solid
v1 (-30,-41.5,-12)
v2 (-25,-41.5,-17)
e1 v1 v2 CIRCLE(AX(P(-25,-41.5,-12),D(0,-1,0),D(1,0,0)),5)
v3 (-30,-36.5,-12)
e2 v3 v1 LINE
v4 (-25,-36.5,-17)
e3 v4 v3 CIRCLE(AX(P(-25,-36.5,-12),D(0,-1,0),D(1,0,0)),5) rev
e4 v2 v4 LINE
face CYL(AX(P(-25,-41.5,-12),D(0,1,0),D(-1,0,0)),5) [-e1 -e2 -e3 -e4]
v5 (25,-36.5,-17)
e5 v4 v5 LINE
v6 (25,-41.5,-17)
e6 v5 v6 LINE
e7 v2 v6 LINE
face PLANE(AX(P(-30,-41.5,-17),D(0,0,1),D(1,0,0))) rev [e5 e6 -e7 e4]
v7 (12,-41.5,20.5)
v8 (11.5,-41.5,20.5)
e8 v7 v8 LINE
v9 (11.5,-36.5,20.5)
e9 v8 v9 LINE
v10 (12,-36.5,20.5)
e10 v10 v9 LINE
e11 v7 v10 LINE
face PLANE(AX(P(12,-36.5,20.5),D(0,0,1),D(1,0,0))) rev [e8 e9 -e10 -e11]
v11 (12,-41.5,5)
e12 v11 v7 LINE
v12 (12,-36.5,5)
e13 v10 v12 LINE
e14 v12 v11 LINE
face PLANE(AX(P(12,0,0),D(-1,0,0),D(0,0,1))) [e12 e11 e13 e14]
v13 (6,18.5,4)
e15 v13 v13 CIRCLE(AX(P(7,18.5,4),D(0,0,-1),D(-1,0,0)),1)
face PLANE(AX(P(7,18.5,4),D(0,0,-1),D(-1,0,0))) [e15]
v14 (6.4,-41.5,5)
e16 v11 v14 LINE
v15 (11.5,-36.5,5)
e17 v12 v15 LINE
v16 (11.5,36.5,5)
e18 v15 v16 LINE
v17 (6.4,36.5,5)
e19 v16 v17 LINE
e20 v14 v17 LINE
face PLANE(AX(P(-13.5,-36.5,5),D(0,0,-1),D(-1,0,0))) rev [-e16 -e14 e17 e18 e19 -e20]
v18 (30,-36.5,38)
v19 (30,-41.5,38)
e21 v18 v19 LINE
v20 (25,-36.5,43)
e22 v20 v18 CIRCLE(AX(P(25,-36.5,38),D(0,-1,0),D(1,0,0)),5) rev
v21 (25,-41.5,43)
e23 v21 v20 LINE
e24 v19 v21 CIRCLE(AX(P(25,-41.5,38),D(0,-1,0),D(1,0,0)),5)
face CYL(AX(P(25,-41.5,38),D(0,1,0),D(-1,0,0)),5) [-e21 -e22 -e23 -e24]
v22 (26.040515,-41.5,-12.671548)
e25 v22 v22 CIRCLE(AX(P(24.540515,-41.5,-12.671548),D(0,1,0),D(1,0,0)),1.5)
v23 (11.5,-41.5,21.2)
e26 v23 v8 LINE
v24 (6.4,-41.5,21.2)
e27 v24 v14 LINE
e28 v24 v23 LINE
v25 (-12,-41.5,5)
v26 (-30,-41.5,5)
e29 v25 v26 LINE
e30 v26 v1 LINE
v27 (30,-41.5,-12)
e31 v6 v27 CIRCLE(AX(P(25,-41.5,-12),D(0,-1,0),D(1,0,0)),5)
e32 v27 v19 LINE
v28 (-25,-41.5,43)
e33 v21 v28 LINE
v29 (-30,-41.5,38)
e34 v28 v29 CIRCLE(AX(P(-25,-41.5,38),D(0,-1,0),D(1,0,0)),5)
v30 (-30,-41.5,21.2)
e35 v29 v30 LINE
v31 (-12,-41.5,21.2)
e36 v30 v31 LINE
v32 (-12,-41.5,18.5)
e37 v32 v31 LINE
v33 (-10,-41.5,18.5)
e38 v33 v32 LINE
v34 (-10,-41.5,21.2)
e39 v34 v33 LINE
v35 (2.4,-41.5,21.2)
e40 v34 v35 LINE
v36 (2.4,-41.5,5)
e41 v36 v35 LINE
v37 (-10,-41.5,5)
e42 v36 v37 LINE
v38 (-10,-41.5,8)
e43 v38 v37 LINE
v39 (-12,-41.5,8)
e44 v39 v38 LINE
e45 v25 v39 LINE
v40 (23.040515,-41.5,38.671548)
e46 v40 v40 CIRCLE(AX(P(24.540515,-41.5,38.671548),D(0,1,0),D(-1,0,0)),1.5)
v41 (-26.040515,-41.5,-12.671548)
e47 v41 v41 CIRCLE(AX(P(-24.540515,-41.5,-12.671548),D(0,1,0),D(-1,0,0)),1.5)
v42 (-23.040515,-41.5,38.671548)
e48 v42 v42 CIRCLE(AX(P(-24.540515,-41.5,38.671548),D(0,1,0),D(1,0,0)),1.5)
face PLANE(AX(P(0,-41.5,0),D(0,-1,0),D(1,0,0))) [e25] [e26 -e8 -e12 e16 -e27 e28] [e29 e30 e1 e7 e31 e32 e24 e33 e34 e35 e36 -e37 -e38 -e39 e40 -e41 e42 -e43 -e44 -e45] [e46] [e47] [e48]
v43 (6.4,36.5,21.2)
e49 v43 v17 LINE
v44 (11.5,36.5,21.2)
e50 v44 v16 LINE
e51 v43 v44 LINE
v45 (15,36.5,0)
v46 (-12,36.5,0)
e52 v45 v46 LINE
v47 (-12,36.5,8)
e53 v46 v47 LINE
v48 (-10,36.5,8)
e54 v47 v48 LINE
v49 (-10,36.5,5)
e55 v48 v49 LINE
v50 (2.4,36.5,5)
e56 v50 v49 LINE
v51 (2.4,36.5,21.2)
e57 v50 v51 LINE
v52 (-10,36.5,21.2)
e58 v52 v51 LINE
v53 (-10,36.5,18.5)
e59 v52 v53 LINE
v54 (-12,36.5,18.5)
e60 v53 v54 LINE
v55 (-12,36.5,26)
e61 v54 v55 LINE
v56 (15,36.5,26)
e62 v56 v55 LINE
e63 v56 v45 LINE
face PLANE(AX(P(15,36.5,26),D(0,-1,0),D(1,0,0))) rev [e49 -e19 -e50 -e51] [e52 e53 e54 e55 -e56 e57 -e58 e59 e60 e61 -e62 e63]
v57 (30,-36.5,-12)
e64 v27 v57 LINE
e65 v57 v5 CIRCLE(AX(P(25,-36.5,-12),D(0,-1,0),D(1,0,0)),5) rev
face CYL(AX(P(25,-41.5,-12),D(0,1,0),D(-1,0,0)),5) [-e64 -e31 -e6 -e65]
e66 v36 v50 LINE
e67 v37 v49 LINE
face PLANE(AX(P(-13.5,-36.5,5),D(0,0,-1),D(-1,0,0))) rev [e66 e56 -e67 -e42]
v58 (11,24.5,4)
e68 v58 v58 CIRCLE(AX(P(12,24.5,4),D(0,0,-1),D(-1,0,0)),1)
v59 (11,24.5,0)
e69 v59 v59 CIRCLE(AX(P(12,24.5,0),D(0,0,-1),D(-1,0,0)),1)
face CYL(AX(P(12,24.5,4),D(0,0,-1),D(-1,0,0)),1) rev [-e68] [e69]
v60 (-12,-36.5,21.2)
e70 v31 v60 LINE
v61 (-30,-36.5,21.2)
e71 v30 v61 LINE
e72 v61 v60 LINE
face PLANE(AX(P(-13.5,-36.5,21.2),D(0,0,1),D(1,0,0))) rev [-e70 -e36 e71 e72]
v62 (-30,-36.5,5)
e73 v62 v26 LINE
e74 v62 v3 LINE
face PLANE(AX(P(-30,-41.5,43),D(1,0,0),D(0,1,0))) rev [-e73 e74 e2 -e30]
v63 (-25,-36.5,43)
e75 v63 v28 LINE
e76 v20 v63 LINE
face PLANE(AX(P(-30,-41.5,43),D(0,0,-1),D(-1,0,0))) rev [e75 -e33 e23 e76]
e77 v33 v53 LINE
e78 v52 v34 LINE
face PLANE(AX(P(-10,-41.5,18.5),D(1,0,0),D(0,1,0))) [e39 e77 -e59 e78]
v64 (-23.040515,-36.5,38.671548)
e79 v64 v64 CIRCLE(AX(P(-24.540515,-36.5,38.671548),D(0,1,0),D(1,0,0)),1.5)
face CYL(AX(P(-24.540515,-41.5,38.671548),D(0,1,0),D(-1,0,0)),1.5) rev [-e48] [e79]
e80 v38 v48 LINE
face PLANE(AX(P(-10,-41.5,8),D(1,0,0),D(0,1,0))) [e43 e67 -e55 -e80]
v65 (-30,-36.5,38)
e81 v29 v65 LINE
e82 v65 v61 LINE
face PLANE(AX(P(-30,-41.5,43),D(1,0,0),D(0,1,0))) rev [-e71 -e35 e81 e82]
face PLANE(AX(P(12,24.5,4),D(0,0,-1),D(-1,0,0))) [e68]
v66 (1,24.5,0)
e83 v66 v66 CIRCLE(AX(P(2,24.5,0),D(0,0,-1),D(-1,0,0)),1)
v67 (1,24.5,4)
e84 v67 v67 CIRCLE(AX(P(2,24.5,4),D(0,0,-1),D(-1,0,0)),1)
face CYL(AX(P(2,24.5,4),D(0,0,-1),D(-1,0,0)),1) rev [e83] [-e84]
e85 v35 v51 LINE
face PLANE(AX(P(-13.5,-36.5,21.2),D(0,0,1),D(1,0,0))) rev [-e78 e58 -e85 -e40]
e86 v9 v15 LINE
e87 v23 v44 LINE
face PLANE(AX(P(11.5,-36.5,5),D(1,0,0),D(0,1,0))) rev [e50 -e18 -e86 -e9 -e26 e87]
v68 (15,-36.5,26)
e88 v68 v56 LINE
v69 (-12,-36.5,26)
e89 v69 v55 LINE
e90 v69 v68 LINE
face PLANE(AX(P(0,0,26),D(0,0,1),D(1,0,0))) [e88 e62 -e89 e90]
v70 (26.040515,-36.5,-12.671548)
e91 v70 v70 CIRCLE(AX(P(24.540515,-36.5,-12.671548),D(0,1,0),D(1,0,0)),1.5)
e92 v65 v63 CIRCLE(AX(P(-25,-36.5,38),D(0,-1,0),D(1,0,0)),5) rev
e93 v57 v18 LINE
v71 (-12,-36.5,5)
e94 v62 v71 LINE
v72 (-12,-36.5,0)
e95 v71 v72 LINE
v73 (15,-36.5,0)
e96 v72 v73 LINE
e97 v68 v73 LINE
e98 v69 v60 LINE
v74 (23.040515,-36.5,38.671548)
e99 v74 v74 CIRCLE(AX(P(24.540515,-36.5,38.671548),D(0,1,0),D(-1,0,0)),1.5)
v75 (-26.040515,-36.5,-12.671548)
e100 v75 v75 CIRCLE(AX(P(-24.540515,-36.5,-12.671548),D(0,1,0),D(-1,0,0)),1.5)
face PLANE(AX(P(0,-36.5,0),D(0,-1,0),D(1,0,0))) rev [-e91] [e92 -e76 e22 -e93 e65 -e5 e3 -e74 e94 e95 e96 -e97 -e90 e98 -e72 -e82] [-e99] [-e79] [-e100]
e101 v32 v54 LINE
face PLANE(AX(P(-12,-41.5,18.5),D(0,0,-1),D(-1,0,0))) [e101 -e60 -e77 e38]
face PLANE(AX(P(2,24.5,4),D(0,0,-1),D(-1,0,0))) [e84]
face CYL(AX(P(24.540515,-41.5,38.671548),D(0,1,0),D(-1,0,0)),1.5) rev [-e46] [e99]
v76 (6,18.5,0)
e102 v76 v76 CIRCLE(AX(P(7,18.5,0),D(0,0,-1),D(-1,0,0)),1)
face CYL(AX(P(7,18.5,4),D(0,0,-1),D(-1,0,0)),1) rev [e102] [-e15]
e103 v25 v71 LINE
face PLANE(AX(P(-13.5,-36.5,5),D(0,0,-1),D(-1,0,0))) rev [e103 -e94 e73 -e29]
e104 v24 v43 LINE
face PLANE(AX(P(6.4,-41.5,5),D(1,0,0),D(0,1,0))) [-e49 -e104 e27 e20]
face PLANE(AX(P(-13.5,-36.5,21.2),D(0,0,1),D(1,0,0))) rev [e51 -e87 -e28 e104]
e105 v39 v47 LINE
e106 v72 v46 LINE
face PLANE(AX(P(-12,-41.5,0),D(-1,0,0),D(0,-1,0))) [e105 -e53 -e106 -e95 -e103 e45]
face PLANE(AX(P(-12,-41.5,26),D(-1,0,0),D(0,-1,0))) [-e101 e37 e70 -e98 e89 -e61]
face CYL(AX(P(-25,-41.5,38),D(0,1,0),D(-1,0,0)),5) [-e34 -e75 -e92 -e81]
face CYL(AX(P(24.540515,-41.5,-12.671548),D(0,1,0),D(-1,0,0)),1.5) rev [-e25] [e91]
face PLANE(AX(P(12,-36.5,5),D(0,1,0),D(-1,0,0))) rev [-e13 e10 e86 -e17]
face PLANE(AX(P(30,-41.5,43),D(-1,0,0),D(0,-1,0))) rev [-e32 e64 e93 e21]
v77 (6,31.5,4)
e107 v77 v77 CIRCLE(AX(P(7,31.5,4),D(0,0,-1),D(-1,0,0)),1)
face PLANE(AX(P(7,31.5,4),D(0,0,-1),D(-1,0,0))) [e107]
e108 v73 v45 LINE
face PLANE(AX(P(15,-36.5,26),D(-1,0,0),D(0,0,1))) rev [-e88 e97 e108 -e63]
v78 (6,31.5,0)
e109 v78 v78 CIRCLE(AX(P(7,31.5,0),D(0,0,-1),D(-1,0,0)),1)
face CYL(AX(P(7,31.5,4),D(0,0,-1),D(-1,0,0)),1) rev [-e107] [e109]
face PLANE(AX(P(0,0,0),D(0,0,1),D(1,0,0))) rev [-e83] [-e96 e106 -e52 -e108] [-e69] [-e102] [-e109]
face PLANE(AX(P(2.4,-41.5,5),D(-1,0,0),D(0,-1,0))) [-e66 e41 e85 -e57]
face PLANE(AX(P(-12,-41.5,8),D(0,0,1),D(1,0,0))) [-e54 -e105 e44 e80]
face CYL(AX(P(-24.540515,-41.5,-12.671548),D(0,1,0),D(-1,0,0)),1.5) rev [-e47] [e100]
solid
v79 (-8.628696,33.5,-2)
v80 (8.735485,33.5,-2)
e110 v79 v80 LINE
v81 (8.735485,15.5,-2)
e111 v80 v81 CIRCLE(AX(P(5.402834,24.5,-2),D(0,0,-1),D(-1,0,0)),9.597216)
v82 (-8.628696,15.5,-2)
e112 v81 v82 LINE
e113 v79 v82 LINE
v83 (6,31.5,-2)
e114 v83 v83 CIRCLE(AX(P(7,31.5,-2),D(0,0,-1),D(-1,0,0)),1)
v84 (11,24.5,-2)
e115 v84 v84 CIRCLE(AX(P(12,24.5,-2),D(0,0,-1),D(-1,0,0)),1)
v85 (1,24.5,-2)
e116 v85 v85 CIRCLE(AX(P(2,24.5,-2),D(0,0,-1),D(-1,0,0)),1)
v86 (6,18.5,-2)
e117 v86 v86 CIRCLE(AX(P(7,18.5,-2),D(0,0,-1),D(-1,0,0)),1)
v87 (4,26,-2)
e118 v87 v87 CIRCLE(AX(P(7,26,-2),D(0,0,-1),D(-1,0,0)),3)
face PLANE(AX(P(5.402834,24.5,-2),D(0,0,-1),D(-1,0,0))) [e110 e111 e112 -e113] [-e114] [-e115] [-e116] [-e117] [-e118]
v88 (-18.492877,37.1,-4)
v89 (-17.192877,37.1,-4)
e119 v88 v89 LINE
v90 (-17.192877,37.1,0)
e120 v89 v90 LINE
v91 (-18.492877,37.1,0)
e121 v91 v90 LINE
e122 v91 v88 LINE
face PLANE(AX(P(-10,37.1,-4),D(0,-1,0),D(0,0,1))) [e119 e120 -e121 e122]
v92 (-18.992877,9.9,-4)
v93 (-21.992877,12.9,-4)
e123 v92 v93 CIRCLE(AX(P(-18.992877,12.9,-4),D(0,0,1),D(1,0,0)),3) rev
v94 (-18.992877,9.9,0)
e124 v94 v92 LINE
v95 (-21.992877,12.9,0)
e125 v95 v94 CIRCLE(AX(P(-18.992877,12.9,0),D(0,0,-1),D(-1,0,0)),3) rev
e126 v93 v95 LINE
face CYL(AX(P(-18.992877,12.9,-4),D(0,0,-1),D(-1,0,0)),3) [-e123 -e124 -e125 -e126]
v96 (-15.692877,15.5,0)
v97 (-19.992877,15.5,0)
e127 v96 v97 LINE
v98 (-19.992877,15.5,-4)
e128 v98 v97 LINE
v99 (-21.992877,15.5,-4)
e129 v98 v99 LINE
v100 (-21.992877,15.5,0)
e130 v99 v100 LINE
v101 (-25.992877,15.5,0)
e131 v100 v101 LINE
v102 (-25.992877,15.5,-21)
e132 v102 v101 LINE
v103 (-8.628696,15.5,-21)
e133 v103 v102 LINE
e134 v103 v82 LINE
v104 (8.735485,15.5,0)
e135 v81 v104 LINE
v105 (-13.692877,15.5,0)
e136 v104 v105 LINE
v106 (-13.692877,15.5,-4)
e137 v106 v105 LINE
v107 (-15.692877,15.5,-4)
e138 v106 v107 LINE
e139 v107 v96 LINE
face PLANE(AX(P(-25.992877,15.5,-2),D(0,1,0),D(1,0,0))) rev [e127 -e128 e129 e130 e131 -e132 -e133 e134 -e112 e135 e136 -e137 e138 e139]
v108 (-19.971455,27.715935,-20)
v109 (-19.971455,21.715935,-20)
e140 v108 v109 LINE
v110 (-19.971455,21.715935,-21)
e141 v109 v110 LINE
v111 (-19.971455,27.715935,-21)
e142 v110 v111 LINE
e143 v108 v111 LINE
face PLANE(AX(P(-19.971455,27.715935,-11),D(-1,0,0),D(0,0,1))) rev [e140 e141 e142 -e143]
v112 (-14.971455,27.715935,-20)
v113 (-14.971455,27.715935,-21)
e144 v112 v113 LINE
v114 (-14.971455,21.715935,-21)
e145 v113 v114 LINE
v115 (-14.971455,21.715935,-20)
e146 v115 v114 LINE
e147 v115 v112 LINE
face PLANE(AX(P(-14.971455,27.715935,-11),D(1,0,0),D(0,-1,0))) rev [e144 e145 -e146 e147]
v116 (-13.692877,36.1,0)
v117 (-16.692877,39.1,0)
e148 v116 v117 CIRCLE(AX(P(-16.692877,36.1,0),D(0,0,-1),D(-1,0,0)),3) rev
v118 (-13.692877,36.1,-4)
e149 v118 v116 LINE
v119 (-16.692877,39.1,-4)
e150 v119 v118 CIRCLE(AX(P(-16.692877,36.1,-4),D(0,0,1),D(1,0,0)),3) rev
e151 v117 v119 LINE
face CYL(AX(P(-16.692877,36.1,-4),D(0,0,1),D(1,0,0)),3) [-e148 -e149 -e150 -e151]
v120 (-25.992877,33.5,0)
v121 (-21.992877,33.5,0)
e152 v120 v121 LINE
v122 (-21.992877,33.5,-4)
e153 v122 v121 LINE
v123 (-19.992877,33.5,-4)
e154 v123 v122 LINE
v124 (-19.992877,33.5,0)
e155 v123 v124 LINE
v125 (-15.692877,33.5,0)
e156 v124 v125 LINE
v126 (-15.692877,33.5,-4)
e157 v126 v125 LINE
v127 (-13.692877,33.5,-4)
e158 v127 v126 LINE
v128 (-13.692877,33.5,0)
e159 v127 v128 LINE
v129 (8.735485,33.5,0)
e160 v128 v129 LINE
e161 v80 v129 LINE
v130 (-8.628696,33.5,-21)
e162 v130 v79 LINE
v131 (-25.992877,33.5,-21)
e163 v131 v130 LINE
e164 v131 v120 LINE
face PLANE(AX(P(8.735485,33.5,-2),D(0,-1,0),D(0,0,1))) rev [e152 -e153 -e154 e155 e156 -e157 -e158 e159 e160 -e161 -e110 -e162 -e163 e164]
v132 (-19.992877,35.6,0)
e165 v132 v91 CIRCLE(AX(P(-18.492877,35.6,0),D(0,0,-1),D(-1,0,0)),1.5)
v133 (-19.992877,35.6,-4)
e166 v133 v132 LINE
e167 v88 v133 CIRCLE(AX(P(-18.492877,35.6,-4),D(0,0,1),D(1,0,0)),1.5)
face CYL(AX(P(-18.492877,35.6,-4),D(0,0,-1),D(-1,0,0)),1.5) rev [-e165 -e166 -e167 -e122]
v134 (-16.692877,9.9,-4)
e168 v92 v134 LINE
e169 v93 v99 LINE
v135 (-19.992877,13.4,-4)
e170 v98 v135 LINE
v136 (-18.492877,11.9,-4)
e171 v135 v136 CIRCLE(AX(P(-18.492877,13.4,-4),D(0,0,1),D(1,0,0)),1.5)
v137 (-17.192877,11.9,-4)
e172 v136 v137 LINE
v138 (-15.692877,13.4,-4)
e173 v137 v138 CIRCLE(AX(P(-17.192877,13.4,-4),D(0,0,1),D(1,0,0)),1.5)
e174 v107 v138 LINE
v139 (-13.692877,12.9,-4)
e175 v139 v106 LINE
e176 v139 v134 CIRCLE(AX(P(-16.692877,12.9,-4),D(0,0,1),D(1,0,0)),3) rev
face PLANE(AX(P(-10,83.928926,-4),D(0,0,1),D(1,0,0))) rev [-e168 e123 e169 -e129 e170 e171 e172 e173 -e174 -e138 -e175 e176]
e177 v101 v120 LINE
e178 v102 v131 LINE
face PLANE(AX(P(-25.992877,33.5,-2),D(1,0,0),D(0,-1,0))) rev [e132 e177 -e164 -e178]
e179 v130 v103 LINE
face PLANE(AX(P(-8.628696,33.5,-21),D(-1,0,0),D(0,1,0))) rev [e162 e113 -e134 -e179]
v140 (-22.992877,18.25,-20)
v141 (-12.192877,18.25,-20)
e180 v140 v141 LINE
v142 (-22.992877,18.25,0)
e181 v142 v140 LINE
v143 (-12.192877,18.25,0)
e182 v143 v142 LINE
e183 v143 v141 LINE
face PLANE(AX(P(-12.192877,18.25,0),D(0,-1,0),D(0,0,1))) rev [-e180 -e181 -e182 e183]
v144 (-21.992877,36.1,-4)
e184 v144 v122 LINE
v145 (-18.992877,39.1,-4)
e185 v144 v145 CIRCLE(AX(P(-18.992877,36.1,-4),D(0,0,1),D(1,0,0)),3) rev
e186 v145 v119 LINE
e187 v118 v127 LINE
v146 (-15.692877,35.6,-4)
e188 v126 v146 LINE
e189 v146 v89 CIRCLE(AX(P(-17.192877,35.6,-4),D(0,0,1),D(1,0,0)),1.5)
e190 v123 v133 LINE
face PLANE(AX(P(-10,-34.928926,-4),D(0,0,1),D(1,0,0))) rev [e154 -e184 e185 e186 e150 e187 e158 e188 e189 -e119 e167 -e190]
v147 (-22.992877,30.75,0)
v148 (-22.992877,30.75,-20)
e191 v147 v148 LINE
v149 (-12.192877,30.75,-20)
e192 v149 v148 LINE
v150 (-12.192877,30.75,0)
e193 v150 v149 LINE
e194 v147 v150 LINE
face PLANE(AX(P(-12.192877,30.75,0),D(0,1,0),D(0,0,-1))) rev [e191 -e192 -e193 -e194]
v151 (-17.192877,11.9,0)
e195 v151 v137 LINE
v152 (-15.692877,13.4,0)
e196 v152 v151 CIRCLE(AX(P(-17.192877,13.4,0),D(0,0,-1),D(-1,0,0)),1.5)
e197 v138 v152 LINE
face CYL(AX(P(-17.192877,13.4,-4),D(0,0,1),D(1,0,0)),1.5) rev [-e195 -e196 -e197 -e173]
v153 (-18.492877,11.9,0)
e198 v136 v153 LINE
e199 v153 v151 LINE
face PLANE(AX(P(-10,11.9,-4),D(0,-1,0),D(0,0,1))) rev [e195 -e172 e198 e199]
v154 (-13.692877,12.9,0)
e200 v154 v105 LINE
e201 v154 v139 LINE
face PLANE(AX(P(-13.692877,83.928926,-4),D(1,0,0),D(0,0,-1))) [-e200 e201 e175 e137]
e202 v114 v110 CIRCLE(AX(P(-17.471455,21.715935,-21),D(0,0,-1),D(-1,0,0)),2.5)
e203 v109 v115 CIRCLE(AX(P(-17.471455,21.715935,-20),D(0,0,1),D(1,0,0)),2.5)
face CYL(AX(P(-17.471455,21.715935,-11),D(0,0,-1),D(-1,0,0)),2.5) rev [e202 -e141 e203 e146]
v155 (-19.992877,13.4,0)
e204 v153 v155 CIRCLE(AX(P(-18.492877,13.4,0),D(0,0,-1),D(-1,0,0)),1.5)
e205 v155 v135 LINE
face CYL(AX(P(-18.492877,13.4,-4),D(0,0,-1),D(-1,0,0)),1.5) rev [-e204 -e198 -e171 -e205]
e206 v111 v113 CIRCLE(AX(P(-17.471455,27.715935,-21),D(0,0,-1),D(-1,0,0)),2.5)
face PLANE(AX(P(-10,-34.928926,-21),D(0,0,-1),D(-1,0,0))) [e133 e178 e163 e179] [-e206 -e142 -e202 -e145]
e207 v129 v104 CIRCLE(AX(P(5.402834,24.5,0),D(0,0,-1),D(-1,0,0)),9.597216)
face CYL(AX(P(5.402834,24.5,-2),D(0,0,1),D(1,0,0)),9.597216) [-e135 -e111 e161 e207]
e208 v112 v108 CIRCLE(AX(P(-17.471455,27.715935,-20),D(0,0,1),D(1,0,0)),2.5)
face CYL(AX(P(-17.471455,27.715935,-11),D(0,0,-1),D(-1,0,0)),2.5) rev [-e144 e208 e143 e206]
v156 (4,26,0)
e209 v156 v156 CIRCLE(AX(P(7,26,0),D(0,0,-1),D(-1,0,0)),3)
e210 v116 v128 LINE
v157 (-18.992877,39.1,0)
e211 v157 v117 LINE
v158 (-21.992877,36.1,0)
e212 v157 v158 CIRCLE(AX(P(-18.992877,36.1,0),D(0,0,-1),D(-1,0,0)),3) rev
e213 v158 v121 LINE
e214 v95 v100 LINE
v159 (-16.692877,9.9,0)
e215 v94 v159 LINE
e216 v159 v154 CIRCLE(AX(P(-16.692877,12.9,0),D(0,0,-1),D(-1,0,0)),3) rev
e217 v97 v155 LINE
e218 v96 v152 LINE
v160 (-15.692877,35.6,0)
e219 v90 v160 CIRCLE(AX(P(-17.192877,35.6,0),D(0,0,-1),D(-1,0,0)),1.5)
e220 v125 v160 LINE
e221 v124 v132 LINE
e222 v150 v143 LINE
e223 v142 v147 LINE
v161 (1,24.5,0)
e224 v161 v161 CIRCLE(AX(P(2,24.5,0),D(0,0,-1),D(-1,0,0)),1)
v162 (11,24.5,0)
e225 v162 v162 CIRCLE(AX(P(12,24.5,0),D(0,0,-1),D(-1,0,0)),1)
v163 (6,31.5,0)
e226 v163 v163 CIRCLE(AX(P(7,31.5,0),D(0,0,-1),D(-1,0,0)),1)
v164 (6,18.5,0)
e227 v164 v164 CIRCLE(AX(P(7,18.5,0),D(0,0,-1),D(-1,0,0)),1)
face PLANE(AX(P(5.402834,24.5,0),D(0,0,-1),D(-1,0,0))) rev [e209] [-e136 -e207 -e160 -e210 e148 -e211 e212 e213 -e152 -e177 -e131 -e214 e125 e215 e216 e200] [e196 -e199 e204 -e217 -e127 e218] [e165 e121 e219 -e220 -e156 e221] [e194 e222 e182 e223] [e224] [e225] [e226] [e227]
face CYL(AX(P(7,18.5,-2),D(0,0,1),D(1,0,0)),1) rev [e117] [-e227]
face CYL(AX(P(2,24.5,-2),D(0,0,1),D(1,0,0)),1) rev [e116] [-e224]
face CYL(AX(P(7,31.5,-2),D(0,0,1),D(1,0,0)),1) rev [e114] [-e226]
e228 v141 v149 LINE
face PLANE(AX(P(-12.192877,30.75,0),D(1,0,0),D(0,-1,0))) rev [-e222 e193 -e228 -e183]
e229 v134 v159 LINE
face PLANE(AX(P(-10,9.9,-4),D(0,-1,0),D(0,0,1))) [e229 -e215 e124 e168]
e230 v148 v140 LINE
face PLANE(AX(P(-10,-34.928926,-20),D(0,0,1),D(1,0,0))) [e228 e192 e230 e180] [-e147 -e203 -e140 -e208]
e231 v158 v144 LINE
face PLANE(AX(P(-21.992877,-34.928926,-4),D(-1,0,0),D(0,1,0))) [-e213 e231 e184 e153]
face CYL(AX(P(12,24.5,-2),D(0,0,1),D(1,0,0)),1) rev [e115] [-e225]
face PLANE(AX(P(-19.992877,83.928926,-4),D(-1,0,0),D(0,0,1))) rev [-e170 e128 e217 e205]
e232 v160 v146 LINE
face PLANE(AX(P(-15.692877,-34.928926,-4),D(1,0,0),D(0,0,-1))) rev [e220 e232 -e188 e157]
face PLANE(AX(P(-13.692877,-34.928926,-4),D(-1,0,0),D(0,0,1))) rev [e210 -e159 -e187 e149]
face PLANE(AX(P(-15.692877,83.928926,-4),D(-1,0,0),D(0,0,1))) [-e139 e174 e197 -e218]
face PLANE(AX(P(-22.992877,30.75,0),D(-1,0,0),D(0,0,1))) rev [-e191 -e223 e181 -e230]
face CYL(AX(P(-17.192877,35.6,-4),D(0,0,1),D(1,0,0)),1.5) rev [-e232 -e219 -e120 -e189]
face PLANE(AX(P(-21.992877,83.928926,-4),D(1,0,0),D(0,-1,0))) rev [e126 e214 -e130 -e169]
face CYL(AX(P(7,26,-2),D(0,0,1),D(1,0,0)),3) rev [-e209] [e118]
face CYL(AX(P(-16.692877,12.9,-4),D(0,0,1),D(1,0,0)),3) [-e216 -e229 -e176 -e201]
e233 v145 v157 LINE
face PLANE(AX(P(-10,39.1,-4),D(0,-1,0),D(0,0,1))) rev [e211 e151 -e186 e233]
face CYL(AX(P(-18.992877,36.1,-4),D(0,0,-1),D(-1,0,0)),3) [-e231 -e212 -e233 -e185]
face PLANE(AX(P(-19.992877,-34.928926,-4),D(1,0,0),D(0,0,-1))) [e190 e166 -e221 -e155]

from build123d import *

# Parameters (mm, degrees)
SKETCH1_W                    = 30
SKETCH1_H                    = 73
BOSS_EXTRUDE1_DEPTH          = 26
SKETCH2_W                    = 25
SKETCH2_H                    = 16.2
CUT_EXTRUDE1_DEPTH           = 79.930349043
SKETCH3_W                    = 26
SKETCH3_H                    = 24
SKETCH3_H_2                  = 16.23422306
CUT_EXTRUDE2_DEPTH           = 5
SKETCH5_W                    = 60
SKETCH5_H                    = 60
BOSS_EXTRUDE2_DEPTH          = 5
FILLET1_R                    = 5
SKETCH6_R                    = 1.5
CUT_EXTRUDE4_DEPTH           = 5
SKETCH7_R                    = 1
CUT_EXTRUDE5_DEPTH           = 4
SKETCH8_W                    = 15.5
SKETCH8_H                    = 5
CUT_EXTRUDE6_DEPTH           = 42
SKETCH9_W                    = 5
SKETCH9_H                    = 26
CUT_EXTRUDE7_DEPTH           = 73
SKETCH10_W                   = 2
SKETCH10_H                   = 8
SKETCH10_H_2                 = 7.5
BOSS_EXTRUDE3_DEPTH          = 78
SKETCH11_W                   = 41.5
SKETCH11_H                   = 0.7
CUT_EXTRUDE8_DEPTH           = 90.877694674
SKETCH13_W                   = 0.7
SKETCH13_H                   = 5
BOSS_EXTRUDE5_DEPTH          = 2
SKETCH15_W                   = 4
SKETCH15_H                   = 16.2
BOSS_EXTRUDE6_DEPTH          = 78
MOTOR_START                  = 62.773326215
MOTOR_PLATFORM_OUTLINE_W     = 17.3641812
MOTOR_PLATFORM_OUTLINE_H     = 18
MOTOR_PLATFORM_OUTLINE_W_2   = 10.8
MOTOR_PLATFORM_OUTLINE_H_2   = 12.5
MOTOR_PLATFORM_DEPTH         = 21
MOTOR_PLATFORM_2_OUTLINE_R   = 1
MOTOR_PLATFORM_2_OUTLINE_R_2 = 3
MOTOR_PLATFORM_2_DEPTH       = 2
MOTOR_START_2                = 64.773326215
MOTOR_PLATFORM_3_DEPTH       = 2
MOTOR_START_3                = 82.773326215
MOTOR_PLATFORM_4_OUTLINE_W   = 10.8
MOTOR_PLATFORM_4_OUTLINE_H   = 12.5
MOTOR_PLATFORM_4_DEPTH       = 1
BODY_MOVE_COPY1_ANGLE        = 180


with BuildPart() as part:
    # Sketch1 → Boss-Extrude1 (new body)
    with BuildSketch(Plane.XY):
        Rectangle(SKETCH1_W, SKETCH1_H)
    extrude(amount=BOSS_EXTRUDE1_DEPTH)

    # Sketch2 → Cut-Extrude1 (cut, through all)
    with BuildSketch(Plane(origin=(0, 36.5, 0), x_dir=(1, 0, 0), z_dir=(0, 1, 0))):
        with Locations((-1, -13.1)):
            Rectangle(SKETCH2_W, SKETCH2_H)
    extrude(amount=-CUT_EXTRUDE1_DEPTH, mode=Mode.SUBTRACT)

    # Sketch3 → Cut-Extrude2 (cut)
    with BuildSketch(Plane.ZY.offset(15)):
        with Locations((13, 21.5)):
            Rectangle(SKETCH3_W, SKETCH3_H)
        with Locations((13, -5.5)):
            Rectangle(SKETCH3_W, SKETCH3_H)
        with Locations((13, -28.61711153)):
            Rectangle(SKETCH3_W, SKETCH3_H_2)
    extrude(amount=-CUT_EXTRUDE2_DEPTH, mode=Mode.SUBTRACT)

    # Sketch5 → Boss-Extrude2 (add)
    with BuildSketch(Plane(origin=(0, -36.5, 0), x_dir=(-1, 0, 0), z_dir=(0, -1, 0))):
        with Locations((0, -13)):
            Rectangle(SKETCH5_W, SKETCH5_H)
    extrude(amount=BOSS_EXTRUDE2_DEPTH)

    # Fillet1
    fillet1_edges = [part.edges().sort_by_distance(p)[0] for p in [
        (30, -39, -17),
        (30, -39, 43),
        (-30, -39, 43),
        (-30, -39, -17),
    ]]
    fillet(fillet1_edges, radius=FILLET1_R)

    # Sketch6 → Cut-Extrude4 (cut)
    with BuildSketch(Plane(origin=(0, -36.5, 0), x_dir=(1, 0, 0), z_dir=(0, 1, 0))):
        with Locations(Location((-24.540514854, 12.671548216, 0), (0, 0, 180))):
            Circle(SKETCH6_R)
        with Locations((24.540514854, 12.671548216)):
            Circle(SKETCH6_R)
        with Locations((-24.540514854, -38.671548216)):
            Circle(SKETCH6_R)
        with Locations(Location((24.540514854, -38.671548216, 0), (0, 0, 180))):
            Circle(SKETCH6_R)
    extrude(amount=-CUT_EXTRUDE4_DEPTH, mode=Mode.SUBTRACT)

    # Sketch7 → Cut-Extrude5 (cut)
    with BuildSketch(Plane(origin=(0, 0, 0), x_dir=(-1, 0, 0), z_dir=(0, 0, -1))):
        with Locations((-7, 31.5)):
            Circle(SKETCH7_R)
        with Locations((-12, 24.5)):
            Circle(SKETCH7_R)
        with Locations((-2, 24.5)):
            Circle(SKETCH7_R)
        with Locations((-7, 18.5)):
            Circle(SKETCH7_R)
    extrude(amount=-CUT_EXTRUDE5_DEPTH, mode=Mode.SUBTRACT)

    # Sketch8 → Cut-Extrude6 (cut)
    with BuildSketch(Plane.ZY.offset(30)):
        with Locations((12.75, -39)):
            Rectangle(SKETCH8_W, SKETCH8_H)
    extrude(amount=-CUT_EXTRUDE6_DEPTH, mode=Mode.SUBTRACT)

    # Sketch9 → Cut-Extrude7 (cut)
    with BuildSketch(Plane(origin=(0, 36.5, 0), x_dir=(1, 0, 0), z_dir=(0, 1, 0))):
        with Locations((-12.5, -13)):
            Rectangle(SKETCH9_W, SKETCH9_H)
    extrude(amount=-CUT_EXTRUDE7_DEPTH, mode=Mode.SUBTRACT)

    # Sketch10 → Boss-Extrude3 (add)
    with BuildSketch(Plane(origin=(0, 36.5, 0), x_dir=(1, 0, 0), z_dir=(0, 1, 0))):
        with Locations((-11, -4)):
            Rectangle(SKETCH10_W, SKETCH10_H)
        with Locations((-11, -22.25)):
            Rectangle(SKETCH10_W, SKETCH10_H_2)
    extrude(amount=-BOSS_EXTRUDE3_DEPTH)

    # Sketch11 → Cut-Extrude8 (cut, through all)
    with BuildSketch(Plane(origin=(0, -36.5, 0), x_dir=(1, 0, 0), z_dir=(0, 1, 0))):
        with Locations((-9.25, -20.85)):
            Rectangle(SKETCH11_W, SKETCH11_H)
    extrude(amount=-CUT_EXTRUDE8_DEPTH, mode=Mode.SUBTRACT)

    # Sketch13 → Boss-Extrude5 (add)
    with BuildSketch(Plane.ZY.offset(12)):
        with Locations((20.85, -39)):
            Rectangle(SKETCH13_W, SKETCH13_H)
    extrude(amount=-BOSS_EXTRUDE5_DEPTH)

    # Sketch15 → Boss-Extrude6 (add)
    with BuildSketch(Plane(origin=(0, 36.5, 0), x_dir=(1, 0, 0), z_dir=(0, 1, 0))):
        with Locations((4.4, -13.1)):
            Rectangle(SKETCH15_W, SKETCH15_H)
    extrude(amount=-BOSS_EXTRUDE6_DEPTH)


with BuildPart() as body_2:
    # motor platform: read off the stored shape, not the designer's step
    # motor platform outline → motor platform (new body)
    with BuildSketch(Plane.XY.offset(MOTOR_START)):
        with Locations((55.40107427, 57.368007859)):
            Rectangle(MOTOR_PLATFORM_OUTLINE_W, MOTOR_PLATFORM_OUTLINE_H)
        with Locations((55.68316487, 57.368007859)):
            Rectangle(MOTOR_PLATFORM_OUTLINE_W_2, MOTOR_PLATFORM_OUTLINE_H_2, mode=Mode.SUBTRACT)
    extrude(amount=MOTOR_PLATFORM_DEPTH)

    # motor platform 2 outline → motor platform 2 (add)
    # profile 1 of 3: a face of its own
    with BuildSketch(Plane.XY.offset(MOTOR_START)):
        with BuildLine():
            Line((60.08316487, 45.768007859), (60.08316487, 48.368007859))
            Line((60.08316487, 48.368007859), (58.08316487, 48.368007859))
            Line((58.08316487, 48.368007859), (58.08316487, 46.268007859))
            ThreePointArc((58.08316487, 46.268007859), (57.643825042, 45.207347687), (56.58316487, 44.768007859))
            Line((56.58316487, 44.768007859), (55.28316487, 44.768007859))
            ThreePointArc((55.28316487, 44.768007859), (54.222504698, 45.207347687), (53.78316487, 46.268007859))
            Line((53.78316487, 46.268007859), (53.78316487, 48.368007859))
            Line((53.78316487, 48.368007859), (51.78316487, 48.368007859))
            Line((51.78316487, 48.368007859), (51.78316487, 45.768007859))
            ThreePointArc((51.78316487, 45.768007859), (52.661844527, 43.646687515), (54.78316487, 42.768007859))
            Line((54.78316487, 42.768007859), (57.08316487, 42.768007859))
            ThreePointArc((57.08316487, 42.768007859), (59.204485214, 43.646687515), (60.08316487, 45.768007859))
        make_face()
    # profile 2 of 3: a face of its own
    with BuildSketch(Plane.XY.offset(MOTOR_START)):
        with BuildLine():
            Line((58.08316487, 66.368007859), (60.08316487, 66.368007859))
            Line((60.08316487, 66.368007859), (60.08316487, 68.968007859))
            ThreePointArc((60.08316487, 68.968007859), (59.204485214, 71.089328202), (57.08316487, 71.968007859))
            Line((57.08316487, 71.968007859), (54.78316487, 71.968007859))
            ThreePointArc((54.78316487, 71.968007859), (52.661844527, 71.089328202), (51.78316487, 68.968007859))
            Line((51.78316487, 68.968007859), (51.78316487, 66.368007859))
            Line((51.78316487, 66.368007859), (53.78316487, 66.368007859))
            Line((53.78316487, 66.368007859), (53.78316487, 68.468007859))
            ThreePointArc((53.78316487, 68.468007859), (54.222504698, 69.528668031), (55.28316487, 69.968007859))
            Line((55.28316487, 69.968007859), (56.58316487, 69.968007859))
            ThreePointArc((56.58316487, 69.968007859), (57.643825042, 69.528668031), (58.08316487, 68.468007859))
            Line((58.08316487, 68.468007859), (58.08316487, 66.368007859))
        make_face()
    # profile 3 of 3: a face of its own
    with BuildSketch(Plane.XY.offset(MOTOR_START)):
        with BuildLine():
            Line((29.354802469, 48.368007859), (46.71898367, 48.368007859))
            Line((46.71898367, 48.368007859), (46.71898367, 66.368007859))
            Line((46.71898367, 66.368007859), (29.354802469, 66.368007859))
            ThreePointArc((29.354802469, 66.368007859), (23.090237203, 57.368007859), (29.354802469, 48.368007859))
        make_face()
        with Locations((31.09028738, 51.368007859)):
            Circle(MOTOR_PLATFORM_2_OUTLINE_R, mode=Mode.SUBTRACT)
        with Locations((26.09028738, 57.368007859)):
            Circle(MOTOR_PLATFORM_2_OUTLINE_R, mode=Mode.SUBTRACT)
        with Locations((31.09028738, 58.868007859)):
            Circle(MOTOR_PLATFORM_2_OUTLINE_R_2, mode=Mode.SUBTRACT)
        with Locations((31.09028738, 64.368007859)):
            Circle(MOTOR_PLATFORM_2_OUTLINE_R, mode=Mode.SUBTRACT)
        with Locations((36.09028738, 57.368007859)):
            Circle(MOTOR_PLATFORM_2_OUTLINE_R, mode=Mode.SUBTRACT)
    extrude(amount=MOTOR_PLATFORM_2_DEPTH)

    # motor platform 3 outline → motor platform 3 (add)
    with BuildSketch(Plane.XY.offset(MOTOR_START_2)):
        with BuildLine():
            Line((60.08316487, 45.768007859), (60.08316487, 48.368007859))
            Line((60.08316487, 48.368007859), (58.08316487, 48.368007859))
            Line((58.08316487, 48.368007859), (58.08316487, 46.268007859))
            ThreePointArc((58.08316487, 46.268007859), (57.643825042, 45.207347687), (56.58316487, 44.768007859))
            Line((56.58316487, 44.768007859), (55.28316487, 44.768007859))
            ThreePointArc((55.28316487, 44.768007859), (54.222504698, 45.207347687), (53.78316487, 46.268007859))
            Line((53.78316487, 46.268007859), (53.78316487, 48.368007859))
            Line((53.78316487, 48.368007859), (51.78316487, 48.368007859))
            Line((51.78316487, 48.368007859), (51.78316487, 45.768007859))
            ThreePointArc((51.78316487, 45.768007859), (52.661844527, 43.646687515), (54.78316487, 42.768007859))
            Line((54.78316487, 42.768007859), (57.08316487, 42.768007859))
            ThreePointArc((57.08316487, 42.768007859), (59.204485214, 43.646687515), (60.08316487, 45.768007859))
        make_face()
        with BuildLine():
            Line((58.08316487, 66.368007859), (60.08316487, 66.368007859))
            Line((60.08316487, 66.368007859), (60.08316487, 68.968007859))
            ThreePointArc((60.08316487, 68.968007859), (59.204485214, 71.089328202), (57.08316487, 71.968007859))
            Line((57.08316487, 71.968007859), (54.78316487, 71.968007859))
            ThreePointArc((54.78316487, 71.968007859), (52.661844527, 71.089328202), (51.78316487, 68.968007859))
            Line((51.78316487, 68.968007859), (51.78316487, 66.368007859))
            Line((51.78316487, 66.368007859), (53.78316487, 66.368007859))
            Line((53.78316487, 66.368007859), (53.78316487, 68.468007859))
            ThreePointArc((53.78316487, 68.468007859), (54.222504698, 69.528668031), (55.28316487, 69.968007859))
            Line((55.28316487, 69.968007859), (56.58316487, 69.968007859))
            ThreePointArc((56.58316487, 69.968007859), (57.643825042, 69.528668031), (58.08316487, 68.468007859))
            Line((58.08316487, 68.468007859), (58.08316487, 66.368007859))
        make_face()
    extrude(amount=MOTOR_PLATFORM_3_DEPTH)

    # motor platform 4 outline → motor platform 4 (add)
    with BuildSketch(Plane.XY.offset(MOTOR_START_3)):
        with Locations((55.68316487, 57.368007859)):
            Rectangle(MOTOR_PLATFORM_4_OUTLINE_W, MOTOR_PLATFORM_4_OUTLINE_H)
        with BuildLine():
            ThreePointArc((53.061742153, 60.583943356), (55.561742153, 63.083943356), (58.061742153, 60.583943356))
            Line((58.061742153, 60.583943356), (58.061742153, 54.583943356))
            ThreePointArc((58.061742153, 54.583943356), (55.561742153, 52.083943356), (53.061742153, 54.583943356))
            Line((53.061742153, 54.583943356), (53.061742153, 60.583943356))
        make_face(mode=Mode.SUBTRACT)
    extrude(amount=MOTOR_PLATFORM_4_DEPTH)


with BuildPart() as body_2_1:
    # Body-Move/Copy1: read off the stored shape, not the designer's step
    # Body-Move/Copy1: moved
    add(body_2.part.moved(Location((-38.0902874, -32.8680079, -62.7733262))).rotate(Axis((0, 0, 0), (0, 1, 0)), BODY_MOVE_COPY1_ANGLE))


solid = Compound([part.part, body_2_1.part])
